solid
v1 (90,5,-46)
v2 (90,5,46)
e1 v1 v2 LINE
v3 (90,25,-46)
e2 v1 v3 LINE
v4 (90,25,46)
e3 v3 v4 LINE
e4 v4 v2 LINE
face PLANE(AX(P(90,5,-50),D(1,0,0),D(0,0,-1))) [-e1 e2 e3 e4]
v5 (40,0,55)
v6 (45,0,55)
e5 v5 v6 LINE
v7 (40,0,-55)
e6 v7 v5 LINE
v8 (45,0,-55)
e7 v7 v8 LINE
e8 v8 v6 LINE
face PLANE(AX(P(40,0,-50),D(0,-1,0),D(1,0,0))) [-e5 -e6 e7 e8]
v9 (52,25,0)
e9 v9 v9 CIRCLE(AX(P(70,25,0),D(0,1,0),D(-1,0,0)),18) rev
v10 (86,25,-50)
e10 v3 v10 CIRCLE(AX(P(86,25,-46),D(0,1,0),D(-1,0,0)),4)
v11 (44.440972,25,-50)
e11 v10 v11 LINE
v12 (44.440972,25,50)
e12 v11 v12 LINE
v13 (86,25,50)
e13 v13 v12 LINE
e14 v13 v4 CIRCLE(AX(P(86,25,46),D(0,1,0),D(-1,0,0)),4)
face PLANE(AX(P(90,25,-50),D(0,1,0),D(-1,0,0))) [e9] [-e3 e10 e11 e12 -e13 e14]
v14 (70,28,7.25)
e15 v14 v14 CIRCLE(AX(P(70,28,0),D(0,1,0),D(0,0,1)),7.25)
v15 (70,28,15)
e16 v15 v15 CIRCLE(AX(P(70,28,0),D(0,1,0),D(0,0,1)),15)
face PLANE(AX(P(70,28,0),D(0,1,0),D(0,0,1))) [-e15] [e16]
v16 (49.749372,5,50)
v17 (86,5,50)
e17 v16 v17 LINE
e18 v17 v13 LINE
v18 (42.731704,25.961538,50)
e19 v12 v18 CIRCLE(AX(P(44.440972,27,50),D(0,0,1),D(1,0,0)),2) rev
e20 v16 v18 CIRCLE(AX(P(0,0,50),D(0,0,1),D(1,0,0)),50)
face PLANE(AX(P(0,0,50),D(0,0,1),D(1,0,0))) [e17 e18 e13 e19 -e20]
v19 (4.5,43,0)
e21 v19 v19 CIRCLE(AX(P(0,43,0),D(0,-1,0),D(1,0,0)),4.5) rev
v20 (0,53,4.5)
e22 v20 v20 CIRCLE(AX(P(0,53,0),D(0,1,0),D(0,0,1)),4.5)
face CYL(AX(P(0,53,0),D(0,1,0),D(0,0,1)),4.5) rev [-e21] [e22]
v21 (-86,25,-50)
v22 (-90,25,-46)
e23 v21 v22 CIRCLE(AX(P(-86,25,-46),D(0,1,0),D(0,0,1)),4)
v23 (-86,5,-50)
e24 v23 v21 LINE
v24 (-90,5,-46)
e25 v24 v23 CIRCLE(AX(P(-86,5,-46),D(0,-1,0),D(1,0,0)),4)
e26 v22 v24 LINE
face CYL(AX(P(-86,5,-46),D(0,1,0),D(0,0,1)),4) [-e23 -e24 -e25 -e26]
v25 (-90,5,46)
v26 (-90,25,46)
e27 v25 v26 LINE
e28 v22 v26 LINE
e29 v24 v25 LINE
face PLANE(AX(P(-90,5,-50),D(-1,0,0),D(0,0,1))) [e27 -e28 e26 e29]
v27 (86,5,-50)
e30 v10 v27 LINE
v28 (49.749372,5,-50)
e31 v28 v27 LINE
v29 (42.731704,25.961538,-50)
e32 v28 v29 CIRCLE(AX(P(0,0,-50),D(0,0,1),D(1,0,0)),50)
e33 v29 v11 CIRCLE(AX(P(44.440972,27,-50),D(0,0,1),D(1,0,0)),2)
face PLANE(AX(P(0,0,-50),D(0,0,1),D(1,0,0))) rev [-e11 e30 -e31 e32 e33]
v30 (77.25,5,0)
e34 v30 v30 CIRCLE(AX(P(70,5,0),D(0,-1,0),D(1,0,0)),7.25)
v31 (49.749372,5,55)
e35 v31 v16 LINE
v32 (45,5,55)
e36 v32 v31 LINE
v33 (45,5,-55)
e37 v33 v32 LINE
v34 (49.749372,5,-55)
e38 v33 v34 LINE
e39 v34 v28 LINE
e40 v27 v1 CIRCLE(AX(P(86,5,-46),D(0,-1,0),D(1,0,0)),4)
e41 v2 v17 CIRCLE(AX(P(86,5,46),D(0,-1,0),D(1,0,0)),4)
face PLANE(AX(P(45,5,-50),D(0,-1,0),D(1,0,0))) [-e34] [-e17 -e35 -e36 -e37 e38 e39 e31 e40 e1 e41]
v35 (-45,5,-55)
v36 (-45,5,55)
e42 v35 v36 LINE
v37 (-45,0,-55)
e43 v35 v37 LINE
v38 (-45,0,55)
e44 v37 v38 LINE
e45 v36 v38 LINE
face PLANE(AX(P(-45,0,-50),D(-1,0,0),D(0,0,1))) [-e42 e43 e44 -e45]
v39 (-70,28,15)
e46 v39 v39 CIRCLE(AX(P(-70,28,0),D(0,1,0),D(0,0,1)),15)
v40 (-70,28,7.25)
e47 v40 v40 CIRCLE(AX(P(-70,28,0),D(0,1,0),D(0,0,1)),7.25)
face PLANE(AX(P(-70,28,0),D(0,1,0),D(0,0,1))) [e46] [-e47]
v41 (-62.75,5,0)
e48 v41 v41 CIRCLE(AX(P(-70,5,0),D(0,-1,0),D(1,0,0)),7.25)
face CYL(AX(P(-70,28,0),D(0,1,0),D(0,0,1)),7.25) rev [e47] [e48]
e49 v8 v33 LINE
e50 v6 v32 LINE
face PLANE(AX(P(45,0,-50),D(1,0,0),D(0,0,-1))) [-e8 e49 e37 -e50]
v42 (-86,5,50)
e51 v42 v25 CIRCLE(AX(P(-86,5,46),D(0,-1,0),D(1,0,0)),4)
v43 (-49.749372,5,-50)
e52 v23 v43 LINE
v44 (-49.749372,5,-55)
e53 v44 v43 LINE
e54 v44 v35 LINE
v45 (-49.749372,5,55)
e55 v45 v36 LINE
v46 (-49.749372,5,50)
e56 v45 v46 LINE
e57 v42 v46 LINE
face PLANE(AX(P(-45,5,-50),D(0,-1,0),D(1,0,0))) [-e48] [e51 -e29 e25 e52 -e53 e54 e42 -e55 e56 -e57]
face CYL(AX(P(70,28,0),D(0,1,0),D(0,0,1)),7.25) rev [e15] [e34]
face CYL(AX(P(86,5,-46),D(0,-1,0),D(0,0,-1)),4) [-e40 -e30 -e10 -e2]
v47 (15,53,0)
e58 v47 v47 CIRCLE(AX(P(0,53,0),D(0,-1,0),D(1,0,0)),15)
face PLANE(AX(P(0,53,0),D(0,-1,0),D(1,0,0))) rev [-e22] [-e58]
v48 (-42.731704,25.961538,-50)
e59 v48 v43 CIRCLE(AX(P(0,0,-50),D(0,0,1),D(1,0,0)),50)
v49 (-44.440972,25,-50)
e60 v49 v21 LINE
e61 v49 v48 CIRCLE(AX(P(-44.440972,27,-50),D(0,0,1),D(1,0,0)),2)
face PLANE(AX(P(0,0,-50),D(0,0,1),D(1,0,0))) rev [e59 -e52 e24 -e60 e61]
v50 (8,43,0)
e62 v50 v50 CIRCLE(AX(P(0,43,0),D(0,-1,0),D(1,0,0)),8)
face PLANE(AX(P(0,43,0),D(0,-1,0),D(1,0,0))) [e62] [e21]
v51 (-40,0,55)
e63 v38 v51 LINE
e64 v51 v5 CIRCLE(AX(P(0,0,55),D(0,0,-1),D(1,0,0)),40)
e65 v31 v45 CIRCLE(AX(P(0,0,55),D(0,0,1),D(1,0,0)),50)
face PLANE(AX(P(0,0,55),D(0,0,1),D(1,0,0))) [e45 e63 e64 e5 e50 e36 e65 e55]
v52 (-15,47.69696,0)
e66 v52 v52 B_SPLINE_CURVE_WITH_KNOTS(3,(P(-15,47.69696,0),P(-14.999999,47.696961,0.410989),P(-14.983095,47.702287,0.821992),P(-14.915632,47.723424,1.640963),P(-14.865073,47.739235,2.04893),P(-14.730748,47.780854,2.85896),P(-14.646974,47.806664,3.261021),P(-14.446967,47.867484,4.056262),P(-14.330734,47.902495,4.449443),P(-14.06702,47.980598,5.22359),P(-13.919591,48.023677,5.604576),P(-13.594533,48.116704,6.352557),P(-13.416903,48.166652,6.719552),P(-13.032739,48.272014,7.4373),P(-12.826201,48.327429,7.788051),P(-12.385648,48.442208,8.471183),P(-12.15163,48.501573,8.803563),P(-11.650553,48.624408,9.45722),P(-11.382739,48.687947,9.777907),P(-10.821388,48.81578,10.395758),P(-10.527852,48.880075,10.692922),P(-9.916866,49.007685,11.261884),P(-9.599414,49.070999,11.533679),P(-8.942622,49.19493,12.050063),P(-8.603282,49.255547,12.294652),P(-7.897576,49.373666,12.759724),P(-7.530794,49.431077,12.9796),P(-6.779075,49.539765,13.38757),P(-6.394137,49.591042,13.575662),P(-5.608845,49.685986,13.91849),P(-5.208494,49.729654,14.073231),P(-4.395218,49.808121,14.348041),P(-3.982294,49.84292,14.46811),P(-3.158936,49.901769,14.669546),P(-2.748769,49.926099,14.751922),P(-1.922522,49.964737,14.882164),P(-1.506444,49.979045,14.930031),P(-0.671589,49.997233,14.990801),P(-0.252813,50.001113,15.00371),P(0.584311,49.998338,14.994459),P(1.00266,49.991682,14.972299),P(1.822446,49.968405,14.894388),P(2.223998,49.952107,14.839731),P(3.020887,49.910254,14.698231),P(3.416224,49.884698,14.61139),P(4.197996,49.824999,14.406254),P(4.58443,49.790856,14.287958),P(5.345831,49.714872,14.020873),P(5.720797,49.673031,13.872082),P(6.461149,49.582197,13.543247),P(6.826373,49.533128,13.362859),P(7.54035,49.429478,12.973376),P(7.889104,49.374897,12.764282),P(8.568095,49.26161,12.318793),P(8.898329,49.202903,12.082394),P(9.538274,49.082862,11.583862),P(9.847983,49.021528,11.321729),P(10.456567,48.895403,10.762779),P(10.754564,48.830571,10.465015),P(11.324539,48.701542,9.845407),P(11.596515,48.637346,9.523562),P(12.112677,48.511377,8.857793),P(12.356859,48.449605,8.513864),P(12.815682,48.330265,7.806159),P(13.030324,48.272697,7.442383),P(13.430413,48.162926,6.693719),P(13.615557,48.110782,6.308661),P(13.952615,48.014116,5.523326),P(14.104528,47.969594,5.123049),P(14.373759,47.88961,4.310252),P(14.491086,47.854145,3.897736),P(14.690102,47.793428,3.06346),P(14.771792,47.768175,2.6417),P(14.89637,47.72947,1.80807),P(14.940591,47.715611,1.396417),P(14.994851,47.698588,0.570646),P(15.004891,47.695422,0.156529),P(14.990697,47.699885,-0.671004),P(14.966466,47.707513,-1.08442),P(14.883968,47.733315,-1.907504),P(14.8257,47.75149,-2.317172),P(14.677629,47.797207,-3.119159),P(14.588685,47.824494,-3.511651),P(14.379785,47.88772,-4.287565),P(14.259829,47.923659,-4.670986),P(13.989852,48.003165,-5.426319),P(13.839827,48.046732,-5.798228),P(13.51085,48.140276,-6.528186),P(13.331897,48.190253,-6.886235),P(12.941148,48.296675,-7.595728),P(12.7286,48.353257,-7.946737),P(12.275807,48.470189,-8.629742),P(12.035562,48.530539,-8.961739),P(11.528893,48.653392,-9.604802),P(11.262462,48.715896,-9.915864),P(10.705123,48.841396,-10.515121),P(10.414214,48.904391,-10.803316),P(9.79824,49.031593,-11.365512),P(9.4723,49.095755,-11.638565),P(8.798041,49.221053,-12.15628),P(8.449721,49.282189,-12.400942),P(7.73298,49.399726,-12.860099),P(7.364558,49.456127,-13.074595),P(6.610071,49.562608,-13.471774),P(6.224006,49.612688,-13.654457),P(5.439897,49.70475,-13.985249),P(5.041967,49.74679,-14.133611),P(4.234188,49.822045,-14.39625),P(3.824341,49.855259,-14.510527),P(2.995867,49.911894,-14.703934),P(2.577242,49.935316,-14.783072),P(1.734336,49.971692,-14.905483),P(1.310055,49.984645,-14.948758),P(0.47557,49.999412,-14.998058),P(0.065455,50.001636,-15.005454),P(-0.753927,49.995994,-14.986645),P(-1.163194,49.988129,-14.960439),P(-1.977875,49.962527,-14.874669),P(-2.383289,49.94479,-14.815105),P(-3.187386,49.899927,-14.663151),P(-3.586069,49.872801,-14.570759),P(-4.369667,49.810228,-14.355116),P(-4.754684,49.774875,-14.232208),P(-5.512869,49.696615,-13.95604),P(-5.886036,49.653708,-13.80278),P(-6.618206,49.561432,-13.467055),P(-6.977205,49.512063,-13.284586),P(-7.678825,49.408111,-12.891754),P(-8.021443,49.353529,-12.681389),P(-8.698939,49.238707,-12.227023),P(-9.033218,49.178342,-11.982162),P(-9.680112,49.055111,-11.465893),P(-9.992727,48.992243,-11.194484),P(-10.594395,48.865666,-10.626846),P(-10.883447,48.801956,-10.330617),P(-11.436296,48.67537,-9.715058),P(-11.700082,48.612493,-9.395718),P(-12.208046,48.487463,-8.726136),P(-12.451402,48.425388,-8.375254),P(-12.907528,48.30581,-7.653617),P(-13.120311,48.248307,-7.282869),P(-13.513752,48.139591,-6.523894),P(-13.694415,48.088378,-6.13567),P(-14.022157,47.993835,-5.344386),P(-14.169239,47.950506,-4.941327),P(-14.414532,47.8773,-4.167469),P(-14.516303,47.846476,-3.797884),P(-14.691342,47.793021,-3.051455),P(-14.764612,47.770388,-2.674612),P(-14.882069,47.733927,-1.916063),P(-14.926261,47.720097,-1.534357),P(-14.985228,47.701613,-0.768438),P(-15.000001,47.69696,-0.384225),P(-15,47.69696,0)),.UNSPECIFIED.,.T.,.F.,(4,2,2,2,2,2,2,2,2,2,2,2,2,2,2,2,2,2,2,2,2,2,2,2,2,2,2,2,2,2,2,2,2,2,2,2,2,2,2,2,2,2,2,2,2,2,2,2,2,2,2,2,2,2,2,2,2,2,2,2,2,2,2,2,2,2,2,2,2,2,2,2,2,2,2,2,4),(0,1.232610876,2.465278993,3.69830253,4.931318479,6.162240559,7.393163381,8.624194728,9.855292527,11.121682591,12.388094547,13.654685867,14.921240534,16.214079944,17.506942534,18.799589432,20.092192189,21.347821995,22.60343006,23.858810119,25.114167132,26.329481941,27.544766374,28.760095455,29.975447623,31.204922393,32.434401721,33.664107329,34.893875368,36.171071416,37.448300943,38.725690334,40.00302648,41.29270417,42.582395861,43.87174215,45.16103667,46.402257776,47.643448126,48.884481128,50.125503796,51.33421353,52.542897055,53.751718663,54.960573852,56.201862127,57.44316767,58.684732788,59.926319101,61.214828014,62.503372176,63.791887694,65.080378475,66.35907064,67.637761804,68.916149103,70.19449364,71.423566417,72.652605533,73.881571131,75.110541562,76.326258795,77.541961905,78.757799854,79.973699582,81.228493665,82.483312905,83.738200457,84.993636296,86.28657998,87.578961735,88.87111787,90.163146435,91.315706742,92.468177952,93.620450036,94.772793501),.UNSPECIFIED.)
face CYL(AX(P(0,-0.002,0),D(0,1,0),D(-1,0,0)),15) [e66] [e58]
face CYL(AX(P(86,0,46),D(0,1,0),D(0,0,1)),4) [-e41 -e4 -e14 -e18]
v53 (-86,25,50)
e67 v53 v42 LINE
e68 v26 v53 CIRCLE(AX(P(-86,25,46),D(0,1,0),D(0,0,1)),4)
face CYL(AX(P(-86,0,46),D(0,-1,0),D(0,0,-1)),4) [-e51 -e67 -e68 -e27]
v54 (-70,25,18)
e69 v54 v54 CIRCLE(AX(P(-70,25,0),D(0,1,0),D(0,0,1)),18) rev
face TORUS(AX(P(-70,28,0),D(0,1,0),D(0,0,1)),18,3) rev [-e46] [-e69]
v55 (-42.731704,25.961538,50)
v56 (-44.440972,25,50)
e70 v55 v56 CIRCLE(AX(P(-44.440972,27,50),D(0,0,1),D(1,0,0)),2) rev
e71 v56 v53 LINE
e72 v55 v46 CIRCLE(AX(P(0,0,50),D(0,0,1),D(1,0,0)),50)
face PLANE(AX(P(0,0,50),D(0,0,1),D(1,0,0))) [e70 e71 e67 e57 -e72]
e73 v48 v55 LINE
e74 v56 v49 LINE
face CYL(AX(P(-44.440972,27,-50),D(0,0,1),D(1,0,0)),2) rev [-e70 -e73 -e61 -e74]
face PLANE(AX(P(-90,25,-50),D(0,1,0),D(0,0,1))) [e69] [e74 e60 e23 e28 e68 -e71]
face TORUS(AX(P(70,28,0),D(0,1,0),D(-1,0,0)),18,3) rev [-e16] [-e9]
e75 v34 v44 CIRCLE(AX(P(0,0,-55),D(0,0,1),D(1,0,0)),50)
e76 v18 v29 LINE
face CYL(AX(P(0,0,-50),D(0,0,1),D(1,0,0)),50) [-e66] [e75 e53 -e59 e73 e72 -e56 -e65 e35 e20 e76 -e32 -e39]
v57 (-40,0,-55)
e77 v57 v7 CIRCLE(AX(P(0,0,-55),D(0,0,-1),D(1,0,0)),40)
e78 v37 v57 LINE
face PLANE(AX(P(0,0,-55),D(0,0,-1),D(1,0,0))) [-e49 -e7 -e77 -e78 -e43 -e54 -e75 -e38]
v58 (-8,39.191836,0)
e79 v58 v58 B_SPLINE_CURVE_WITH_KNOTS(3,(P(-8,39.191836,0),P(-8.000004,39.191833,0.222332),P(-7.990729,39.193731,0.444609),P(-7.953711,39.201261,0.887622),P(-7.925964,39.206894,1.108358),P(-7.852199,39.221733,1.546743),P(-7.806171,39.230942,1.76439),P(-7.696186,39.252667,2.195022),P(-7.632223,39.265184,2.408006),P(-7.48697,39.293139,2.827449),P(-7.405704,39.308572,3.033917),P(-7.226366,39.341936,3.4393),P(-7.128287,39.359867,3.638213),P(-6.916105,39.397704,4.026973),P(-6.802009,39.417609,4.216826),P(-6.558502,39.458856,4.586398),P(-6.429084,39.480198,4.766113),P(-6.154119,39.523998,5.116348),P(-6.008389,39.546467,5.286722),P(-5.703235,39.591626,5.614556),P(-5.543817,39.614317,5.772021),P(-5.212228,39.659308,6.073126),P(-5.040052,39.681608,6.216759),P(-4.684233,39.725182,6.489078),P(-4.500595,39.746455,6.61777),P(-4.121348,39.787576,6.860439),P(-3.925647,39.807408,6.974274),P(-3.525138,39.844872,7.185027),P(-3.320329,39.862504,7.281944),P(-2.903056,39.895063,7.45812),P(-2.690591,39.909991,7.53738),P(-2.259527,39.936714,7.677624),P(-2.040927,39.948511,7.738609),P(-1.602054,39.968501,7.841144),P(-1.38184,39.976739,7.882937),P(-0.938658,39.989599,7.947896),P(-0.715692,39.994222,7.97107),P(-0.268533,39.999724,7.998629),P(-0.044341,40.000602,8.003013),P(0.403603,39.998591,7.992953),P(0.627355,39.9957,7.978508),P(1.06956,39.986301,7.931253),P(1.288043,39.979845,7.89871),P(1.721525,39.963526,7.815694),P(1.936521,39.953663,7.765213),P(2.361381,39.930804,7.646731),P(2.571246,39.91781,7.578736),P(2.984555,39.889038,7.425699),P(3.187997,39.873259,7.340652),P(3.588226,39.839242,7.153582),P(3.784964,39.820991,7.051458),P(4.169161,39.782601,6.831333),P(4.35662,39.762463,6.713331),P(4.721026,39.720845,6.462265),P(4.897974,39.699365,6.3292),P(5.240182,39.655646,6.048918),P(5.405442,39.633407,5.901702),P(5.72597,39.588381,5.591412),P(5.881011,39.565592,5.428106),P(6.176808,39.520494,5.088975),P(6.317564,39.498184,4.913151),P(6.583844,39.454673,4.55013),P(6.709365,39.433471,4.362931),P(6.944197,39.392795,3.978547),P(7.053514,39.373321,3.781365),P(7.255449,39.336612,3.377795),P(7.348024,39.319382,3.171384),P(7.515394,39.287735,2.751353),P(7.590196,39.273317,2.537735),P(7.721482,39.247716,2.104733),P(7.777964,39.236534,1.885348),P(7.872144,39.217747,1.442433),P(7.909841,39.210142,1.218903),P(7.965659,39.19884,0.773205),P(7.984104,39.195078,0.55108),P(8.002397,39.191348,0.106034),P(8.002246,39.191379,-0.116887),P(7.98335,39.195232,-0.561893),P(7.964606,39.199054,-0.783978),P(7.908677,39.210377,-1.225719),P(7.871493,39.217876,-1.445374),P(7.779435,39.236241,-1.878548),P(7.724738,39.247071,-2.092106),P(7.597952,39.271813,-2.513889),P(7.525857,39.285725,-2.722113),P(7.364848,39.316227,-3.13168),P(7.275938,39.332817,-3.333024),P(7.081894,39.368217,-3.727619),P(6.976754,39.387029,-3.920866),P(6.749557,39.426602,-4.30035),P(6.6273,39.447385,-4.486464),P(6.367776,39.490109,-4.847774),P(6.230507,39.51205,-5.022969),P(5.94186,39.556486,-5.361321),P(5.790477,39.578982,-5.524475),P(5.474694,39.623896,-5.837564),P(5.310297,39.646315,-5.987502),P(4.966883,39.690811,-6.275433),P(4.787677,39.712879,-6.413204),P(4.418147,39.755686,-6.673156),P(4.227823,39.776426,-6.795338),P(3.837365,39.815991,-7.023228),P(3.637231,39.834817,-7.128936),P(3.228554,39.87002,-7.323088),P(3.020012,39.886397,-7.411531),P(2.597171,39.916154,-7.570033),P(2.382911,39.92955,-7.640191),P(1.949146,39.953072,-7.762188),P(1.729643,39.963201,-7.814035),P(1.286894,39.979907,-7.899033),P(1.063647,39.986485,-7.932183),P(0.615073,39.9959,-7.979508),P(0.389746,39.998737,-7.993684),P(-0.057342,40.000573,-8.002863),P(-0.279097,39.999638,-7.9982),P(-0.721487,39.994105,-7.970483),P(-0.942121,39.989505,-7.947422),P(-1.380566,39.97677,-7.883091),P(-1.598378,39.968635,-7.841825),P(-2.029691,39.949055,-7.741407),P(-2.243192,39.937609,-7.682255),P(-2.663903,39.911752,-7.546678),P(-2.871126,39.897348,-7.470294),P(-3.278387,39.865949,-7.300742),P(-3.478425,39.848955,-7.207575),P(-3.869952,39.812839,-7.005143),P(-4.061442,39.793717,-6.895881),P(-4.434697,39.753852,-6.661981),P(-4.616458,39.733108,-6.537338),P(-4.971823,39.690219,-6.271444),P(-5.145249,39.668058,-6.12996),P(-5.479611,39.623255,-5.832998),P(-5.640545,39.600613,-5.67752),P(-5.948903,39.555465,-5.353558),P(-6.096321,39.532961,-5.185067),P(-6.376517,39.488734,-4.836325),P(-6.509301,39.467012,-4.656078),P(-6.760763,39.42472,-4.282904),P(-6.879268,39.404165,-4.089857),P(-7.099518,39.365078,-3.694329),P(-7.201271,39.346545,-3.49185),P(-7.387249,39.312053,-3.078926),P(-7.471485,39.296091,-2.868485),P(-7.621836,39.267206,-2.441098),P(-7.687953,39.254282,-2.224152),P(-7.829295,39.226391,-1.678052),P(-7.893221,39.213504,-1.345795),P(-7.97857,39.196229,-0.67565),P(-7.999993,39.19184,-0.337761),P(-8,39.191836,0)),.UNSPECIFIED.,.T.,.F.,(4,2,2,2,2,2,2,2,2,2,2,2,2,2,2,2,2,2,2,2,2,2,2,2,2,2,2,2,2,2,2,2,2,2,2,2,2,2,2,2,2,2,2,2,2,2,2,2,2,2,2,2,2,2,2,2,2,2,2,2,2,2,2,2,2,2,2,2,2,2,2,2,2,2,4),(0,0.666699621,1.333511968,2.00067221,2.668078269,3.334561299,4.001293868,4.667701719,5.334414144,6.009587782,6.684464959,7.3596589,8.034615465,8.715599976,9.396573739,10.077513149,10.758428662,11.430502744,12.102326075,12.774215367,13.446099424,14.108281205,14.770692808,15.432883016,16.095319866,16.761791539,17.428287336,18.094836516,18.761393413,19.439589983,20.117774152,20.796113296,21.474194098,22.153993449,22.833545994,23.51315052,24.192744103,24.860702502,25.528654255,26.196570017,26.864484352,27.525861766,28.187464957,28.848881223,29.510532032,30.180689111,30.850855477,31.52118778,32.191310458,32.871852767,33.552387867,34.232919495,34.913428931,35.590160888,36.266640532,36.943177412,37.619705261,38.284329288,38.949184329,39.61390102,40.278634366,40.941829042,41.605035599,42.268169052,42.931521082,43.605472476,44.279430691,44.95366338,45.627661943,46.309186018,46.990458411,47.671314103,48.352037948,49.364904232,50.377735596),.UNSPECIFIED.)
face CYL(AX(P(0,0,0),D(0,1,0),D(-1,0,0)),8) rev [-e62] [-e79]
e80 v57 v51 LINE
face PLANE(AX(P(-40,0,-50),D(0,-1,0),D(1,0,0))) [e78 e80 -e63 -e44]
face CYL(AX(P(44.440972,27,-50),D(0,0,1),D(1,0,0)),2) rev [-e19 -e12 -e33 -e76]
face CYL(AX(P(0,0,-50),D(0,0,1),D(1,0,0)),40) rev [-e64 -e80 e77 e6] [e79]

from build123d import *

# Parameters (mm, degrees)
BOSS_EXTRUDE1_DEPTH      = 50
BOSS_EXTRUDE2_START      = 5
BOSS_EXTRUDE2_DEPTH      = 5
SKETCH3_R                = 15
BOSS_EXTRUDE3_DEPTH      = 3
FILLET1_R                = 3
M16X1_5_TAPPED_HOLE1_D   = 14.5
BOSS_EXTRUDE6_REACH      = 120.042
BOSS_EXTRUDE6_END_RADIUS = 50
SKETCH11_R               = 15
M10X1_0_TAPPED_HOLE1_D   = 9
SKETCH15_R               = 8
CUT_EXTRUDE1_DEPTH       = 114.903467988
FILLET2_R                = 2
FILLET3_R                = 4


with BuildPart() as part:
    # Sketch1 → Boss-Extrude1 (new, symmetric)
    with BuildSketch(Plane.XY):
        with BuildLine():
            Line((-40, 0), (-45, 0))
            Line((-45, 0), (-45, 5))
            Line((-45, 5), (-90, 5))
            Line((-90, 5), (-90, 25))
            Line((-90, 25), (-43.301270189, 25))
            ThreePointArc((-43.301270189, 25), (0, 50), (43.301270189, 25))
            Line((43.301270189, 25), (90, 25))
            Line((90, 25), (90, 5))
            Line((90, 5), (45, 5))
            Line((45, 5), (45, 0))
            Line((45, 0), (40, 0))
            ThreePointArc((40, 0), (0, 40), (-40, 0))
        make_face()
    extrude(amount=BOSS_EXTRUDE1_DEPTH, both=True)

    # Sketch2 → Boss-Extrude2 (add)
    with BuildSketch(Plane.XY.offset(50).offset(BOSS_EXTRUDE2_START)):
        with BuildLine():
            Line((40, 0), (45, 0))
            Line((45, 0), (45, 5))
            Line((45, 5), (49.749371855, 5))
            ThreePointArc((49.749371855, 5), (0, 50), (-49.749371855, 5))
            Line((-49.749371855, 5), (-45, 5))
            Line((-45, 5), (-45, 0))
            Line((-45, 0), (-40, 0))
            ThreePointArc((-40, 0), (0, 40), (40, 0))
        make_face()
    boss_extrude2 = extrude(amount=-BOSS_EXTRUDE2_DEPTH)

    # Mirror1: Boss-Extrude2 across plane
    add(boss_extrude2.mirror(Plane.XY))

    # Sketch3 → Boss-Extrude3 (add)
    with BuildSketch(Plane(origin=(0, 25, 0), x_dir=(1, 0, 0), z_dir=(0, 1, 0))):
        with Locations(Location((-70, 0, 0), (0, 0, 270))):
            Circle(SKETCH3_R)
        with Locations(Location((70, 0, 0), (0, 0, 270))):
            Circle(SKETCH3_R)
    extrude(amount=BOSS_EXTRUDE3_DEPTH)

    # Fillet1
    fillet1_edges = [part.edges().sort_by_distance(p)[0] for p in [
        (-70, 25, -15),
        (70, 25, -15),
    ]]
    fillet(fillet1_edges, radius=FILLET1_R - 0.0001)  # a hair under: the kernel refuses the full size

    # M16x1.5 Tapped Hole1 (through all)
    with Locations(Plane(origin=(0, 28, 0), x_dir=(1, 0, 0), z_dir=(0, 1, 0))):
        with Locations((-70, 0), (70, 0)):
            Hole(M16X1_5_TAPPED_HOLE1_D / 2)

    # Boss-Extrude6: up to this cylinder (the profile starts outside it)
    boss_extrude6_end = Plane(origin=(0, 0, 0), z_dir=(0, 0, 1)) * Cylinder(BOSS_EXTRUDE6_END_RADIUS, 341.084, mode=Mode.PRIVATE)
    # Sketch11 → Boss-Extrude6 (add, up to the surface)
    with BuildSketch(Plane(origin=(0, 53, 0), x_dir=(-1, 0, 0), z_dir=(0, -1, 0)), mode=Mode.PRIVATE) as boss_extrude6_sk1:
        Circle(SKETCH11_R)
    boss_extrude6_tool1 = extrude(boss_extrude6_sk1.sketch, amount=BOSS_EXTRUDE6_REACH, mode=Mode.PRIVATE) - boss_extrude6_end
    add(boss_extrude6_tool1.solids().sort_by_distance((0, 53, 0))[0])

    # M10x1.0 Tapped Hole1 (through all)
    with Locations(Plane(origin=(0, 53, 0), x_dir=(1, 0, 0), z_dir=(0, 1, 0))):
        with Locations((0, 0)):
            Hole(M10X1_0_TAPPED_HOLE1_D / 2)

    # Sketch15 → Cut-Extrude1 (cut, through all)
    with BuildSketch(Plane(origin=(0, 43, 0), x_dir=(-1, 0, 0), z_dir=(0, -1, 0))):
        Circle(SKETCH15_R)
    extrude(amount=CUT_EXTRUDE1_DEPTH, mode=Mode.SUBTRACT)

    # Fillet2
    fillet2_edges = [part.edges().sort_by_distance(p)[0] for p in [
        (-43.301270189, 25, 0),
        (43.301270189, 25, 0),
    ]]
    fillet(fillet2_edges, radius=FILLET2_R)

    # Fillet3
    fillet3_edges = [part.edges().sort_by_distance(p)[0] for p in [
        (-90, 15, 50),
        (90, 15, 50),
        (90, 15, -50),
        (-90, 15, -50),
    ]]
    fillet(fillet3_edges, radius=FILLET3_R)


solid = part.part
